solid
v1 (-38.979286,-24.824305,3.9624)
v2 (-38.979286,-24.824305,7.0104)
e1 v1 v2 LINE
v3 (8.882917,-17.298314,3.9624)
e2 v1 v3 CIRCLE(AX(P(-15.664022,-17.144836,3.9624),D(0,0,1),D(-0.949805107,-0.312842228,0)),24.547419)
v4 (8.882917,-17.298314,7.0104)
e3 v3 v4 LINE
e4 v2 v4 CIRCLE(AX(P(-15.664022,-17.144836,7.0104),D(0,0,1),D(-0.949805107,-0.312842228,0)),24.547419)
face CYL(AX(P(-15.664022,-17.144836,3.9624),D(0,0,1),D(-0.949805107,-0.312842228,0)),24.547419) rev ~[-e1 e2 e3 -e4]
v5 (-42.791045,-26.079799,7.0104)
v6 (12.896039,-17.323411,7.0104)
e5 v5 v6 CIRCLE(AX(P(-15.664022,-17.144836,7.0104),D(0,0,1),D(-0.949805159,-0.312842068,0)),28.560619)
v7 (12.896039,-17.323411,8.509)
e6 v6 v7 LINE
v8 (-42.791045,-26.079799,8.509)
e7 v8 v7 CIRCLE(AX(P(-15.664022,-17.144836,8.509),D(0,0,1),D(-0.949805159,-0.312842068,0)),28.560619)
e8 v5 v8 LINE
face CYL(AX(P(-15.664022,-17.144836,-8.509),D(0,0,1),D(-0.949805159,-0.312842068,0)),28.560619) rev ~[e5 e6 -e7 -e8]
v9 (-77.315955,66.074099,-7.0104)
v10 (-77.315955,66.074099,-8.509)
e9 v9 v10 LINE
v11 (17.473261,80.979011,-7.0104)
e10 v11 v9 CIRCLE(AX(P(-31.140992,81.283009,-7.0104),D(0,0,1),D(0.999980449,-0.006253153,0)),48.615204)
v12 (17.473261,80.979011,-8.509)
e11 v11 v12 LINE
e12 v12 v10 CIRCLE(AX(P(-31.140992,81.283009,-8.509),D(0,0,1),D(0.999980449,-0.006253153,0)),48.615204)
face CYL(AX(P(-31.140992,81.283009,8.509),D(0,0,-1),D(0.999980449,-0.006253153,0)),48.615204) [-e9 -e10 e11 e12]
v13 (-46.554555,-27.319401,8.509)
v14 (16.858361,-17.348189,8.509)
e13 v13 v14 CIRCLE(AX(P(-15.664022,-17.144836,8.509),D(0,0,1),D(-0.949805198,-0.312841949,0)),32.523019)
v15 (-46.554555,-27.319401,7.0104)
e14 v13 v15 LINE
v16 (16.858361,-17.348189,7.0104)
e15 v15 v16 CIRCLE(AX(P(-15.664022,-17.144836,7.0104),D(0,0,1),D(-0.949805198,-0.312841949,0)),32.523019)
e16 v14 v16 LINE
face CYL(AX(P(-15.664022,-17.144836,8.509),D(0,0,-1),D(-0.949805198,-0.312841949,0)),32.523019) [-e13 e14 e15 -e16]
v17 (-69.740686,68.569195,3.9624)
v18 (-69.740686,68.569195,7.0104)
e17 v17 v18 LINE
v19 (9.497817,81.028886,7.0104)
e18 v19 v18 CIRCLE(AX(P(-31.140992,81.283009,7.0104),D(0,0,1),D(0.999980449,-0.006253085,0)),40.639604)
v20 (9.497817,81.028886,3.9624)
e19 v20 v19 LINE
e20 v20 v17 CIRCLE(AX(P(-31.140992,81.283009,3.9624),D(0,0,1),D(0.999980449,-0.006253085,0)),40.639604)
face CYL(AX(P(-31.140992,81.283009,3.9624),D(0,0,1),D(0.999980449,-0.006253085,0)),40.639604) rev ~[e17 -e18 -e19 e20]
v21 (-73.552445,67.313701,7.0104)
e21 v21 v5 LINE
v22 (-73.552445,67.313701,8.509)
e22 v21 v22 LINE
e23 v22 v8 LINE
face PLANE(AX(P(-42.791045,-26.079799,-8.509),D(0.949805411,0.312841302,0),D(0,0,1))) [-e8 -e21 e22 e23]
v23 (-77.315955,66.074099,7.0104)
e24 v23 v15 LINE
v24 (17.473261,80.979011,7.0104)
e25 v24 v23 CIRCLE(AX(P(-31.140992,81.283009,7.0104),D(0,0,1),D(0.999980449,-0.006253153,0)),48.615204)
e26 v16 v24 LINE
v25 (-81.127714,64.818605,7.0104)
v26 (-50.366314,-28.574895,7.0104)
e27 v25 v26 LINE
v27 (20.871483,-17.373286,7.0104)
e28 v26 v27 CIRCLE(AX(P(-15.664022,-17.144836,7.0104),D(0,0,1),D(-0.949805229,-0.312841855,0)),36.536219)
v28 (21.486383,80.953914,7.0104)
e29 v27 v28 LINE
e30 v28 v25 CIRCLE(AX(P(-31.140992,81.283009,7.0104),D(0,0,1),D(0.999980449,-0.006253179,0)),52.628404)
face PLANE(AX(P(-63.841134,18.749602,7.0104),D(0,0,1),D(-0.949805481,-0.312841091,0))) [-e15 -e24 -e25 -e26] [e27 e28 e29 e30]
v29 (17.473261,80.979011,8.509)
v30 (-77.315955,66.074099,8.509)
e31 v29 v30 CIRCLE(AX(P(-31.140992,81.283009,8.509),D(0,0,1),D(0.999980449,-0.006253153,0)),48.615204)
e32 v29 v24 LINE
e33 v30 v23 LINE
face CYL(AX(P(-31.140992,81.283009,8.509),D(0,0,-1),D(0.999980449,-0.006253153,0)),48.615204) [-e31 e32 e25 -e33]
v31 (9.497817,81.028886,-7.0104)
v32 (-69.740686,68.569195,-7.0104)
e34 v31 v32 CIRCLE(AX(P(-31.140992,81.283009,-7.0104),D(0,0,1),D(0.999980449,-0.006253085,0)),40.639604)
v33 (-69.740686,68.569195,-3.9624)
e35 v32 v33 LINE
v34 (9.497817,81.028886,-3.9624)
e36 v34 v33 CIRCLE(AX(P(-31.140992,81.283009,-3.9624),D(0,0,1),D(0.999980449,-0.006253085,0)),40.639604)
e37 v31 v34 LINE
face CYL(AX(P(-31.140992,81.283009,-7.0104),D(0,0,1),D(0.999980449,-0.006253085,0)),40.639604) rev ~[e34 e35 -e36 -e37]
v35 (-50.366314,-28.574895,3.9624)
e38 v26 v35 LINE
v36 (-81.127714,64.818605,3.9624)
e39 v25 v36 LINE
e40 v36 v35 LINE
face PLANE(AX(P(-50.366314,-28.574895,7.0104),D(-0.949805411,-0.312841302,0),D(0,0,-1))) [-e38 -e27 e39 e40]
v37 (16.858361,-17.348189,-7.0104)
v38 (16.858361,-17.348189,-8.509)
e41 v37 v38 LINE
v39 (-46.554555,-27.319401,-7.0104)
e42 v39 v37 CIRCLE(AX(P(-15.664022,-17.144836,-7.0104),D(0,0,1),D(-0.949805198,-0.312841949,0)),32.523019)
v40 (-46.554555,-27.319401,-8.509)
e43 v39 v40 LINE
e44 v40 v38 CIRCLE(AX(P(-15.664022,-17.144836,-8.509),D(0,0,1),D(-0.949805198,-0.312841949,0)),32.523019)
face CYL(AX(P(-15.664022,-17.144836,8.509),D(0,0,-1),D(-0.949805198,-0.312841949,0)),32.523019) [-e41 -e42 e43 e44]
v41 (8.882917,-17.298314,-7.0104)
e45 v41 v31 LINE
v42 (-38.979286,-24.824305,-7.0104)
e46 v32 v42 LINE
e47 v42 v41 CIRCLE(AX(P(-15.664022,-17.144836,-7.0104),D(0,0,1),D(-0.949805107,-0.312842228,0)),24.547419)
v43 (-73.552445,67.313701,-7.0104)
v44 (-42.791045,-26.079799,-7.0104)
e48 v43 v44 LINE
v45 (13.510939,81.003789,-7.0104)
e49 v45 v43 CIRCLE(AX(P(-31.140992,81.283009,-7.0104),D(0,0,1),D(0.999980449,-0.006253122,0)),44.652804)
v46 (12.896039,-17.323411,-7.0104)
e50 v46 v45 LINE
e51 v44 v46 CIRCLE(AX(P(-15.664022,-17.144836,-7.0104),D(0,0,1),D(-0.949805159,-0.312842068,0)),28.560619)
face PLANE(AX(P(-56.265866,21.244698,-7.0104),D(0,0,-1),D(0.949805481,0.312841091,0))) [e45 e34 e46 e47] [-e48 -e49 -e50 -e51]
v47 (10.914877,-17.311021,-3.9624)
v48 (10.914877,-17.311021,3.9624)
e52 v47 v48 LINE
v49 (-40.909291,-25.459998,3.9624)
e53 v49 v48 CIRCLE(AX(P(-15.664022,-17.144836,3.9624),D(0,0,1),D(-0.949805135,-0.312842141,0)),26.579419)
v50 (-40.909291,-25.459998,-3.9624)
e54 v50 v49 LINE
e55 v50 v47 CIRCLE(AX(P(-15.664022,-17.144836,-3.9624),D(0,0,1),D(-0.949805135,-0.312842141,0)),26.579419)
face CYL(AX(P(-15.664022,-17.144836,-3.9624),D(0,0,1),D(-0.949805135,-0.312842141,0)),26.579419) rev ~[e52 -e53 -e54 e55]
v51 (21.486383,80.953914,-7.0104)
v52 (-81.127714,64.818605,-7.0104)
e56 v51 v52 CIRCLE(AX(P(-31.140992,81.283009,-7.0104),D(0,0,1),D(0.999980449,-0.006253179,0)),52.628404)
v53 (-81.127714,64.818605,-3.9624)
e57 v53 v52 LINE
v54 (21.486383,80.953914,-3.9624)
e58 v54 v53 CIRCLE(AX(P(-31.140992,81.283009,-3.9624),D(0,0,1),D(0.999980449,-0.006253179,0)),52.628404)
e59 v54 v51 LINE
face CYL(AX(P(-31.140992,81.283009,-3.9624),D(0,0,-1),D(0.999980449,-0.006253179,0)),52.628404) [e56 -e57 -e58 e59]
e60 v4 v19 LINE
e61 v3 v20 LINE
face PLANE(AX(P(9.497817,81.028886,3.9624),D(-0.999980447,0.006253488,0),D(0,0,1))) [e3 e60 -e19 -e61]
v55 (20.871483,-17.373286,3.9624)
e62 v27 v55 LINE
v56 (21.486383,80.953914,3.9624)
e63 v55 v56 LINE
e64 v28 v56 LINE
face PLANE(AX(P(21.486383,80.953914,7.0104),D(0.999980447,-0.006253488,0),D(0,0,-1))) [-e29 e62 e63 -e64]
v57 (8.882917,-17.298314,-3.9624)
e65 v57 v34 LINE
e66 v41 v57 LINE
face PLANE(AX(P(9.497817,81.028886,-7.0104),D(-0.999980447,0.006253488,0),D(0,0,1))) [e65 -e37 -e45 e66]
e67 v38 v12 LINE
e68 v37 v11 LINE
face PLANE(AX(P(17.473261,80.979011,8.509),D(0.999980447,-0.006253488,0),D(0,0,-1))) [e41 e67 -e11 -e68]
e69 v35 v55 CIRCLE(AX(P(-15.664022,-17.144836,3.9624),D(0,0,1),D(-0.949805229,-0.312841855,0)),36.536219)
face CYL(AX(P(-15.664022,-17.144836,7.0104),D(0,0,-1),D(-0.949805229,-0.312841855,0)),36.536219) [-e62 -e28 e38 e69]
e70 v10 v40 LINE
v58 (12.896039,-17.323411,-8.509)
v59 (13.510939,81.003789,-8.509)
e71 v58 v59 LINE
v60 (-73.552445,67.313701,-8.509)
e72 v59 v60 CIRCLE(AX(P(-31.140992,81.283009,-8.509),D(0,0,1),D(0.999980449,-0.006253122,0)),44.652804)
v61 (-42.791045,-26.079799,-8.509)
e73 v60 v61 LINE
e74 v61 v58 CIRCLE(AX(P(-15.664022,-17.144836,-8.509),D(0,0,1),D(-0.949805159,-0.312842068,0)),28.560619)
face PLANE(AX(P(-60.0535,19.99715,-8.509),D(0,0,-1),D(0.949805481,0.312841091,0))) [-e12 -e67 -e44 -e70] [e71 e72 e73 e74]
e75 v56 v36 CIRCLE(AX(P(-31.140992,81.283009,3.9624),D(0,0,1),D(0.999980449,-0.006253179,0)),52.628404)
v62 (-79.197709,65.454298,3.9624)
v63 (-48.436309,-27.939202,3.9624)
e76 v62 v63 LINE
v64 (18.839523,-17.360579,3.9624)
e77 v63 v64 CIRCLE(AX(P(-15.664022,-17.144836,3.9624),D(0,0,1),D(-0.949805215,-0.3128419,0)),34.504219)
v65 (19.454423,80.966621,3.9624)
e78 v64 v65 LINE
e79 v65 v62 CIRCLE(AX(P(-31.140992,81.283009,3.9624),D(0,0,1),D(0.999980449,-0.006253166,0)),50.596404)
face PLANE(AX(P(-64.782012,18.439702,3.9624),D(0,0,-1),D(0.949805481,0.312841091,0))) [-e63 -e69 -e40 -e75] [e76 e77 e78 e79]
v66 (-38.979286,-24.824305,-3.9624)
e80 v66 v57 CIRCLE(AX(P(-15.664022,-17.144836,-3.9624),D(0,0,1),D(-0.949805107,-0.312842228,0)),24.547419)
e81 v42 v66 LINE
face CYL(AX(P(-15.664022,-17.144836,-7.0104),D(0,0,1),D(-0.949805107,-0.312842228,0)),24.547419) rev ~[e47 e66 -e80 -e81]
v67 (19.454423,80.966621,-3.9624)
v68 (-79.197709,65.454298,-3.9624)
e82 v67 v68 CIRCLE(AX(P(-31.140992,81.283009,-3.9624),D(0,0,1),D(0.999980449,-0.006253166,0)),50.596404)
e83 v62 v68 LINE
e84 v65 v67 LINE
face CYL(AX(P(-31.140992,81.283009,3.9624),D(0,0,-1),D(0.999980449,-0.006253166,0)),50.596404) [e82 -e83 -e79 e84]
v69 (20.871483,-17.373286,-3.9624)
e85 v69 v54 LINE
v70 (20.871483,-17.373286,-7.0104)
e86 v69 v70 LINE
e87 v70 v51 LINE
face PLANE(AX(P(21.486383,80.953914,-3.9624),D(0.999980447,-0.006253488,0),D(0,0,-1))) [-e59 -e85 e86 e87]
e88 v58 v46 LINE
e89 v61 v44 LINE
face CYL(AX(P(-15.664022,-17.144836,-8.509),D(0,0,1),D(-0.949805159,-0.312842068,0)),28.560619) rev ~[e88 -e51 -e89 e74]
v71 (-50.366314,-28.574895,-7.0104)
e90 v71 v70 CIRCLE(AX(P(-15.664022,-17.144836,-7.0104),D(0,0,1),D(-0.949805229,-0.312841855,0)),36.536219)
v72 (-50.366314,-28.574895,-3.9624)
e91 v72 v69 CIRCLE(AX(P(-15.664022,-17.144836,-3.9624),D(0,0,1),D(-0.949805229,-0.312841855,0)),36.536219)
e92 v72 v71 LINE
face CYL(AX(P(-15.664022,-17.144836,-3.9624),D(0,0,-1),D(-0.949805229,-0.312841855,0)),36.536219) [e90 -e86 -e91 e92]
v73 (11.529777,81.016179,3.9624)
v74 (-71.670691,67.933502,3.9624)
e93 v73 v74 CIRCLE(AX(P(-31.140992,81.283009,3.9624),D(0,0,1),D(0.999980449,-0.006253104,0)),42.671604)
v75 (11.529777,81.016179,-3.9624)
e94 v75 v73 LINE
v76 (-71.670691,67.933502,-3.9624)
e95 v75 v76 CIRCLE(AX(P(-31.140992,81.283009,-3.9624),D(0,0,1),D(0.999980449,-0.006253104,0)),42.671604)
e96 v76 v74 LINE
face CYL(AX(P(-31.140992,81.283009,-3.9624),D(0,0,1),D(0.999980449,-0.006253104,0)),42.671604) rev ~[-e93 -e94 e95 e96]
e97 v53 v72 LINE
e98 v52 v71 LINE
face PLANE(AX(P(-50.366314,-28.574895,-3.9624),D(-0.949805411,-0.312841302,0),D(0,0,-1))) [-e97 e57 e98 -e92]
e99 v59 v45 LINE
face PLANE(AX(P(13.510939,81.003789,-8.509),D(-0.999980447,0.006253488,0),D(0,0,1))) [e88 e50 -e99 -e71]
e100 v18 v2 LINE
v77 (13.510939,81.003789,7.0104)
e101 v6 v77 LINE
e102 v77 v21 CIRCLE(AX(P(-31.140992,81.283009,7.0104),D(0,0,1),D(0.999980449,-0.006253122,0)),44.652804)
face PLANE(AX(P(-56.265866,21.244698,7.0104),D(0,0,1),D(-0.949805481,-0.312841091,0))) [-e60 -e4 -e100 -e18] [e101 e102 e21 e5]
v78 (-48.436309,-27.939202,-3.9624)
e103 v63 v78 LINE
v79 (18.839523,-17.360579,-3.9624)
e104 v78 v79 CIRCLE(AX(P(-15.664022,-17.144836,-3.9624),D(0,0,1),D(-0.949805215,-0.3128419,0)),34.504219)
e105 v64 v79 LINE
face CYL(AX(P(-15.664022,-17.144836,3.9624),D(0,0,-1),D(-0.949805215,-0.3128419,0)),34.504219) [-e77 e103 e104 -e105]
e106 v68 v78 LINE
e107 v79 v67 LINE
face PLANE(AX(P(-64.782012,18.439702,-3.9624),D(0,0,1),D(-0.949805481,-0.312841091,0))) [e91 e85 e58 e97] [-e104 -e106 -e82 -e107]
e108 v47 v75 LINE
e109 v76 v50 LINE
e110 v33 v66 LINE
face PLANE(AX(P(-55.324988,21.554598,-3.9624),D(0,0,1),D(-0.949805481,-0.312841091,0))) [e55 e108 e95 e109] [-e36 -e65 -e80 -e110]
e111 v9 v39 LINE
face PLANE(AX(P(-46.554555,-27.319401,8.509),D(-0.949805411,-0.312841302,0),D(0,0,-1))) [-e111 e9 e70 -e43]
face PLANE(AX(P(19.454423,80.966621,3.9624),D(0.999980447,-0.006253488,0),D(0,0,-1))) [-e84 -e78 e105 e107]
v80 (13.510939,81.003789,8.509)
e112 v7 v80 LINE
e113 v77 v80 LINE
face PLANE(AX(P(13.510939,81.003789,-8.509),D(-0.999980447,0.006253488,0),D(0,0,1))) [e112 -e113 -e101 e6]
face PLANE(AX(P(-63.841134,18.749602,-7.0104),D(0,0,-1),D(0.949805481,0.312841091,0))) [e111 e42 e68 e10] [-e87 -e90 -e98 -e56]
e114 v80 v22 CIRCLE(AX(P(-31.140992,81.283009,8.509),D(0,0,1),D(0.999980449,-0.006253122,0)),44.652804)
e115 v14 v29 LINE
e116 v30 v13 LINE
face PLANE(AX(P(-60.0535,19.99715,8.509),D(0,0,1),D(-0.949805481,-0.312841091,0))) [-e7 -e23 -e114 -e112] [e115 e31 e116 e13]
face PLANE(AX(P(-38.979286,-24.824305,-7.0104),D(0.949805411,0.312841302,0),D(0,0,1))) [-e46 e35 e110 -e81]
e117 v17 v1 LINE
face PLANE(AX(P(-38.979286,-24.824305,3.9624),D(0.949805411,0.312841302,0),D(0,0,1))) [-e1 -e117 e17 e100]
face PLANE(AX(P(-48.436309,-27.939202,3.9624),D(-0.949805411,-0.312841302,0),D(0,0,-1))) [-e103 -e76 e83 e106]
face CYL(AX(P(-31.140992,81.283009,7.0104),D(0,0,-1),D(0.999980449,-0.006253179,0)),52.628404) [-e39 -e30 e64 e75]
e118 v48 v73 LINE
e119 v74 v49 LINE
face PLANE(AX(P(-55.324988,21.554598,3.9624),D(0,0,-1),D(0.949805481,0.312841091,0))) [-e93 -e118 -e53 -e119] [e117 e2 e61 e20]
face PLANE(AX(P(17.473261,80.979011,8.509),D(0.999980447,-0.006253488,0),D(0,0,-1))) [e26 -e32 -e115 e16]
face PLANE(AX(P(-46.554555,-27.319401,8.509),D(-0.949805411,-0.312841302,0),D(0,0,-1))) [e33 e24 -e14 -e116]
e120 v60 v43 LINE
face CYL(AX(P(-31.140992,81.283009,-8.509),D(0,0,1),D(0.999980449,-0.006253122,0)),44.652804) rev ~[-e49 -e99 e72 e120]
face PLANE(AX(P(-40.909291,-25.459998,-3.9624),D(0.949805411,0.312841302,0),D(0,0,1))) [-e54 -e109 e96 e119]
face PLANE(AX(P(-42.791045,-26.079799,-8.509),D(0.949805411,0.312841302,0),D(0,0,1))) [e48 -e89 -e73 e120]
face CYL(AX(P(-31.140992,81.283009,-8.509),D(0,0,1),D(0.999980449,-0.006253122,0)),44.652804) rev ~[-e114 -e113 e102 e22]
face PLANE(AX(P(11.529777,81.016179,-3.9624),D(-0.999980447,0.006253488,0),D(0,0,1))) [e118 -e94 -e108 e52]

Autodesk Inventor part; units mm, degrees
ref_plane "Work Plane2" through (-15.664, -17.1448, 0) normal (-1, 0, 0) x (0, 0, 1)
ref_plane "Work Plane3" through (-31.141, 81.283, 0) normal (0.1087823, -0.9940656, 0) x (0, 0, 1)
sketch "Path" plane through (0, 0, 0) normal (0, 0, 1) x (1, 0, 0)
  arc A0 (-44.6728, -26.6996) -> (14.8772, -17.3358) centre (-15.664, -17.1448) ccw
  arc A1 (15.4921, 80.9914) -> (-75.4342, 66.6939) centre (-31.141, 81.283) ccw
  line L0 (15.4921, 80.9914) -> (14.8772, -17.3358)
  line L1 (-44.6728, -26.6996) -> (-75.4342, 66.6939)
  dimension "d31" = 11.9888
ref_plane "Section Plane" through (14.8772, -17.3358, 0) normal (0.0062535, 0.9999804, 0) x (0, 0, 1)
sketch "Section Sketch" plane through (14.8772, -17.3358, 0) normal (0.0062535, 0.9999804, 0) x (0, 0, 1)
  line L0 (-8.509, -1.9812) -> (8.509, -1.9812)
  line L1 (8.509, -1.9812) -> (8.509, 1.9812)
  line L2 (8.509, 1.9812) -> (-8.509, 1.9812)
  line L3 (-8.509, 1.9812) -> (-8.509, -1.9812)
  line L4 (-3.9624, -3.9624) -> (3.9624, -3.9624)
  line L5 (3.9624, -3.9624) -> (3.9624, 3.9624)
  line L6 (3.9624, 3.9624) -> (-3.9624, 3.9624)
  line L7 (-3.9624, 3.9624) -> (-3.9624, -3.9624)
  line L8 (-3.9624, 0) -> (3.9624, 0) construction
  line L9 (-7.0104, -5.9944) -> (-3.9624, -5.9944)
  line L10 (-3.9624, -5.9944) -> (-3.9624, 5.9944)
  line L11 (-3.9624, 5.9944) -> (-7.0104, 5.9944)
  line L12 (-7.0104, 5.9944) -> (-7.0104, -5.9944)
  line L13 (3.9624, -5.9944) -> (7.0104, -5.9944)
  line L14 (7.0104, -5.9944) -> (7.0104, 5.9944)
  line L15 (7.0104, 5.9944) -> (3.9624, 5.9944)
  line L16 (3.9624, 5.9944) -> (3.9624, -5.9944)
  line L17 (-8.509, 0) -> (8.509, 0) construction
  point P0 (0, 0)
  point P1 (0, 0)
  dimension "d21" = 3.9624
  dimension "d22" = 7.9248
  dimension "d23" = 7.9248
  dimension "d24" = 3.048
  dimension "d31" = 11.9888
  dimension "d32" = 17.018
sweep "Solid" add profiles "Section Sketch" path "Path"
pattern_of_one "Strand Pattern"
equation "\"d21\" = da_d2"
equation "\"d22\" = da_d1"
equation "\"d23\" = da_b1"
equation "\"d24\" = da_t1 + da_t2"
equation "\"d30\" = da_pt"
equation "\"da_p\" = 12.7"
equation "\"da_b1\" = 7.9248"
equation "\"da_h2\" = 11.9888"
equation "\"da_h3\" = 10.3886"
equation "\"da_d1\" = 7.9248"
equation "\"da_d2\" = 3.9624"
equation "\"da_pt\" = 14.3764"
equation "\"da_b\" = 17.018"
equation "\"da_t1\" = 1.524"
equation "\"da_t2\" = 1.524"
properties part number "Roller Chain"
